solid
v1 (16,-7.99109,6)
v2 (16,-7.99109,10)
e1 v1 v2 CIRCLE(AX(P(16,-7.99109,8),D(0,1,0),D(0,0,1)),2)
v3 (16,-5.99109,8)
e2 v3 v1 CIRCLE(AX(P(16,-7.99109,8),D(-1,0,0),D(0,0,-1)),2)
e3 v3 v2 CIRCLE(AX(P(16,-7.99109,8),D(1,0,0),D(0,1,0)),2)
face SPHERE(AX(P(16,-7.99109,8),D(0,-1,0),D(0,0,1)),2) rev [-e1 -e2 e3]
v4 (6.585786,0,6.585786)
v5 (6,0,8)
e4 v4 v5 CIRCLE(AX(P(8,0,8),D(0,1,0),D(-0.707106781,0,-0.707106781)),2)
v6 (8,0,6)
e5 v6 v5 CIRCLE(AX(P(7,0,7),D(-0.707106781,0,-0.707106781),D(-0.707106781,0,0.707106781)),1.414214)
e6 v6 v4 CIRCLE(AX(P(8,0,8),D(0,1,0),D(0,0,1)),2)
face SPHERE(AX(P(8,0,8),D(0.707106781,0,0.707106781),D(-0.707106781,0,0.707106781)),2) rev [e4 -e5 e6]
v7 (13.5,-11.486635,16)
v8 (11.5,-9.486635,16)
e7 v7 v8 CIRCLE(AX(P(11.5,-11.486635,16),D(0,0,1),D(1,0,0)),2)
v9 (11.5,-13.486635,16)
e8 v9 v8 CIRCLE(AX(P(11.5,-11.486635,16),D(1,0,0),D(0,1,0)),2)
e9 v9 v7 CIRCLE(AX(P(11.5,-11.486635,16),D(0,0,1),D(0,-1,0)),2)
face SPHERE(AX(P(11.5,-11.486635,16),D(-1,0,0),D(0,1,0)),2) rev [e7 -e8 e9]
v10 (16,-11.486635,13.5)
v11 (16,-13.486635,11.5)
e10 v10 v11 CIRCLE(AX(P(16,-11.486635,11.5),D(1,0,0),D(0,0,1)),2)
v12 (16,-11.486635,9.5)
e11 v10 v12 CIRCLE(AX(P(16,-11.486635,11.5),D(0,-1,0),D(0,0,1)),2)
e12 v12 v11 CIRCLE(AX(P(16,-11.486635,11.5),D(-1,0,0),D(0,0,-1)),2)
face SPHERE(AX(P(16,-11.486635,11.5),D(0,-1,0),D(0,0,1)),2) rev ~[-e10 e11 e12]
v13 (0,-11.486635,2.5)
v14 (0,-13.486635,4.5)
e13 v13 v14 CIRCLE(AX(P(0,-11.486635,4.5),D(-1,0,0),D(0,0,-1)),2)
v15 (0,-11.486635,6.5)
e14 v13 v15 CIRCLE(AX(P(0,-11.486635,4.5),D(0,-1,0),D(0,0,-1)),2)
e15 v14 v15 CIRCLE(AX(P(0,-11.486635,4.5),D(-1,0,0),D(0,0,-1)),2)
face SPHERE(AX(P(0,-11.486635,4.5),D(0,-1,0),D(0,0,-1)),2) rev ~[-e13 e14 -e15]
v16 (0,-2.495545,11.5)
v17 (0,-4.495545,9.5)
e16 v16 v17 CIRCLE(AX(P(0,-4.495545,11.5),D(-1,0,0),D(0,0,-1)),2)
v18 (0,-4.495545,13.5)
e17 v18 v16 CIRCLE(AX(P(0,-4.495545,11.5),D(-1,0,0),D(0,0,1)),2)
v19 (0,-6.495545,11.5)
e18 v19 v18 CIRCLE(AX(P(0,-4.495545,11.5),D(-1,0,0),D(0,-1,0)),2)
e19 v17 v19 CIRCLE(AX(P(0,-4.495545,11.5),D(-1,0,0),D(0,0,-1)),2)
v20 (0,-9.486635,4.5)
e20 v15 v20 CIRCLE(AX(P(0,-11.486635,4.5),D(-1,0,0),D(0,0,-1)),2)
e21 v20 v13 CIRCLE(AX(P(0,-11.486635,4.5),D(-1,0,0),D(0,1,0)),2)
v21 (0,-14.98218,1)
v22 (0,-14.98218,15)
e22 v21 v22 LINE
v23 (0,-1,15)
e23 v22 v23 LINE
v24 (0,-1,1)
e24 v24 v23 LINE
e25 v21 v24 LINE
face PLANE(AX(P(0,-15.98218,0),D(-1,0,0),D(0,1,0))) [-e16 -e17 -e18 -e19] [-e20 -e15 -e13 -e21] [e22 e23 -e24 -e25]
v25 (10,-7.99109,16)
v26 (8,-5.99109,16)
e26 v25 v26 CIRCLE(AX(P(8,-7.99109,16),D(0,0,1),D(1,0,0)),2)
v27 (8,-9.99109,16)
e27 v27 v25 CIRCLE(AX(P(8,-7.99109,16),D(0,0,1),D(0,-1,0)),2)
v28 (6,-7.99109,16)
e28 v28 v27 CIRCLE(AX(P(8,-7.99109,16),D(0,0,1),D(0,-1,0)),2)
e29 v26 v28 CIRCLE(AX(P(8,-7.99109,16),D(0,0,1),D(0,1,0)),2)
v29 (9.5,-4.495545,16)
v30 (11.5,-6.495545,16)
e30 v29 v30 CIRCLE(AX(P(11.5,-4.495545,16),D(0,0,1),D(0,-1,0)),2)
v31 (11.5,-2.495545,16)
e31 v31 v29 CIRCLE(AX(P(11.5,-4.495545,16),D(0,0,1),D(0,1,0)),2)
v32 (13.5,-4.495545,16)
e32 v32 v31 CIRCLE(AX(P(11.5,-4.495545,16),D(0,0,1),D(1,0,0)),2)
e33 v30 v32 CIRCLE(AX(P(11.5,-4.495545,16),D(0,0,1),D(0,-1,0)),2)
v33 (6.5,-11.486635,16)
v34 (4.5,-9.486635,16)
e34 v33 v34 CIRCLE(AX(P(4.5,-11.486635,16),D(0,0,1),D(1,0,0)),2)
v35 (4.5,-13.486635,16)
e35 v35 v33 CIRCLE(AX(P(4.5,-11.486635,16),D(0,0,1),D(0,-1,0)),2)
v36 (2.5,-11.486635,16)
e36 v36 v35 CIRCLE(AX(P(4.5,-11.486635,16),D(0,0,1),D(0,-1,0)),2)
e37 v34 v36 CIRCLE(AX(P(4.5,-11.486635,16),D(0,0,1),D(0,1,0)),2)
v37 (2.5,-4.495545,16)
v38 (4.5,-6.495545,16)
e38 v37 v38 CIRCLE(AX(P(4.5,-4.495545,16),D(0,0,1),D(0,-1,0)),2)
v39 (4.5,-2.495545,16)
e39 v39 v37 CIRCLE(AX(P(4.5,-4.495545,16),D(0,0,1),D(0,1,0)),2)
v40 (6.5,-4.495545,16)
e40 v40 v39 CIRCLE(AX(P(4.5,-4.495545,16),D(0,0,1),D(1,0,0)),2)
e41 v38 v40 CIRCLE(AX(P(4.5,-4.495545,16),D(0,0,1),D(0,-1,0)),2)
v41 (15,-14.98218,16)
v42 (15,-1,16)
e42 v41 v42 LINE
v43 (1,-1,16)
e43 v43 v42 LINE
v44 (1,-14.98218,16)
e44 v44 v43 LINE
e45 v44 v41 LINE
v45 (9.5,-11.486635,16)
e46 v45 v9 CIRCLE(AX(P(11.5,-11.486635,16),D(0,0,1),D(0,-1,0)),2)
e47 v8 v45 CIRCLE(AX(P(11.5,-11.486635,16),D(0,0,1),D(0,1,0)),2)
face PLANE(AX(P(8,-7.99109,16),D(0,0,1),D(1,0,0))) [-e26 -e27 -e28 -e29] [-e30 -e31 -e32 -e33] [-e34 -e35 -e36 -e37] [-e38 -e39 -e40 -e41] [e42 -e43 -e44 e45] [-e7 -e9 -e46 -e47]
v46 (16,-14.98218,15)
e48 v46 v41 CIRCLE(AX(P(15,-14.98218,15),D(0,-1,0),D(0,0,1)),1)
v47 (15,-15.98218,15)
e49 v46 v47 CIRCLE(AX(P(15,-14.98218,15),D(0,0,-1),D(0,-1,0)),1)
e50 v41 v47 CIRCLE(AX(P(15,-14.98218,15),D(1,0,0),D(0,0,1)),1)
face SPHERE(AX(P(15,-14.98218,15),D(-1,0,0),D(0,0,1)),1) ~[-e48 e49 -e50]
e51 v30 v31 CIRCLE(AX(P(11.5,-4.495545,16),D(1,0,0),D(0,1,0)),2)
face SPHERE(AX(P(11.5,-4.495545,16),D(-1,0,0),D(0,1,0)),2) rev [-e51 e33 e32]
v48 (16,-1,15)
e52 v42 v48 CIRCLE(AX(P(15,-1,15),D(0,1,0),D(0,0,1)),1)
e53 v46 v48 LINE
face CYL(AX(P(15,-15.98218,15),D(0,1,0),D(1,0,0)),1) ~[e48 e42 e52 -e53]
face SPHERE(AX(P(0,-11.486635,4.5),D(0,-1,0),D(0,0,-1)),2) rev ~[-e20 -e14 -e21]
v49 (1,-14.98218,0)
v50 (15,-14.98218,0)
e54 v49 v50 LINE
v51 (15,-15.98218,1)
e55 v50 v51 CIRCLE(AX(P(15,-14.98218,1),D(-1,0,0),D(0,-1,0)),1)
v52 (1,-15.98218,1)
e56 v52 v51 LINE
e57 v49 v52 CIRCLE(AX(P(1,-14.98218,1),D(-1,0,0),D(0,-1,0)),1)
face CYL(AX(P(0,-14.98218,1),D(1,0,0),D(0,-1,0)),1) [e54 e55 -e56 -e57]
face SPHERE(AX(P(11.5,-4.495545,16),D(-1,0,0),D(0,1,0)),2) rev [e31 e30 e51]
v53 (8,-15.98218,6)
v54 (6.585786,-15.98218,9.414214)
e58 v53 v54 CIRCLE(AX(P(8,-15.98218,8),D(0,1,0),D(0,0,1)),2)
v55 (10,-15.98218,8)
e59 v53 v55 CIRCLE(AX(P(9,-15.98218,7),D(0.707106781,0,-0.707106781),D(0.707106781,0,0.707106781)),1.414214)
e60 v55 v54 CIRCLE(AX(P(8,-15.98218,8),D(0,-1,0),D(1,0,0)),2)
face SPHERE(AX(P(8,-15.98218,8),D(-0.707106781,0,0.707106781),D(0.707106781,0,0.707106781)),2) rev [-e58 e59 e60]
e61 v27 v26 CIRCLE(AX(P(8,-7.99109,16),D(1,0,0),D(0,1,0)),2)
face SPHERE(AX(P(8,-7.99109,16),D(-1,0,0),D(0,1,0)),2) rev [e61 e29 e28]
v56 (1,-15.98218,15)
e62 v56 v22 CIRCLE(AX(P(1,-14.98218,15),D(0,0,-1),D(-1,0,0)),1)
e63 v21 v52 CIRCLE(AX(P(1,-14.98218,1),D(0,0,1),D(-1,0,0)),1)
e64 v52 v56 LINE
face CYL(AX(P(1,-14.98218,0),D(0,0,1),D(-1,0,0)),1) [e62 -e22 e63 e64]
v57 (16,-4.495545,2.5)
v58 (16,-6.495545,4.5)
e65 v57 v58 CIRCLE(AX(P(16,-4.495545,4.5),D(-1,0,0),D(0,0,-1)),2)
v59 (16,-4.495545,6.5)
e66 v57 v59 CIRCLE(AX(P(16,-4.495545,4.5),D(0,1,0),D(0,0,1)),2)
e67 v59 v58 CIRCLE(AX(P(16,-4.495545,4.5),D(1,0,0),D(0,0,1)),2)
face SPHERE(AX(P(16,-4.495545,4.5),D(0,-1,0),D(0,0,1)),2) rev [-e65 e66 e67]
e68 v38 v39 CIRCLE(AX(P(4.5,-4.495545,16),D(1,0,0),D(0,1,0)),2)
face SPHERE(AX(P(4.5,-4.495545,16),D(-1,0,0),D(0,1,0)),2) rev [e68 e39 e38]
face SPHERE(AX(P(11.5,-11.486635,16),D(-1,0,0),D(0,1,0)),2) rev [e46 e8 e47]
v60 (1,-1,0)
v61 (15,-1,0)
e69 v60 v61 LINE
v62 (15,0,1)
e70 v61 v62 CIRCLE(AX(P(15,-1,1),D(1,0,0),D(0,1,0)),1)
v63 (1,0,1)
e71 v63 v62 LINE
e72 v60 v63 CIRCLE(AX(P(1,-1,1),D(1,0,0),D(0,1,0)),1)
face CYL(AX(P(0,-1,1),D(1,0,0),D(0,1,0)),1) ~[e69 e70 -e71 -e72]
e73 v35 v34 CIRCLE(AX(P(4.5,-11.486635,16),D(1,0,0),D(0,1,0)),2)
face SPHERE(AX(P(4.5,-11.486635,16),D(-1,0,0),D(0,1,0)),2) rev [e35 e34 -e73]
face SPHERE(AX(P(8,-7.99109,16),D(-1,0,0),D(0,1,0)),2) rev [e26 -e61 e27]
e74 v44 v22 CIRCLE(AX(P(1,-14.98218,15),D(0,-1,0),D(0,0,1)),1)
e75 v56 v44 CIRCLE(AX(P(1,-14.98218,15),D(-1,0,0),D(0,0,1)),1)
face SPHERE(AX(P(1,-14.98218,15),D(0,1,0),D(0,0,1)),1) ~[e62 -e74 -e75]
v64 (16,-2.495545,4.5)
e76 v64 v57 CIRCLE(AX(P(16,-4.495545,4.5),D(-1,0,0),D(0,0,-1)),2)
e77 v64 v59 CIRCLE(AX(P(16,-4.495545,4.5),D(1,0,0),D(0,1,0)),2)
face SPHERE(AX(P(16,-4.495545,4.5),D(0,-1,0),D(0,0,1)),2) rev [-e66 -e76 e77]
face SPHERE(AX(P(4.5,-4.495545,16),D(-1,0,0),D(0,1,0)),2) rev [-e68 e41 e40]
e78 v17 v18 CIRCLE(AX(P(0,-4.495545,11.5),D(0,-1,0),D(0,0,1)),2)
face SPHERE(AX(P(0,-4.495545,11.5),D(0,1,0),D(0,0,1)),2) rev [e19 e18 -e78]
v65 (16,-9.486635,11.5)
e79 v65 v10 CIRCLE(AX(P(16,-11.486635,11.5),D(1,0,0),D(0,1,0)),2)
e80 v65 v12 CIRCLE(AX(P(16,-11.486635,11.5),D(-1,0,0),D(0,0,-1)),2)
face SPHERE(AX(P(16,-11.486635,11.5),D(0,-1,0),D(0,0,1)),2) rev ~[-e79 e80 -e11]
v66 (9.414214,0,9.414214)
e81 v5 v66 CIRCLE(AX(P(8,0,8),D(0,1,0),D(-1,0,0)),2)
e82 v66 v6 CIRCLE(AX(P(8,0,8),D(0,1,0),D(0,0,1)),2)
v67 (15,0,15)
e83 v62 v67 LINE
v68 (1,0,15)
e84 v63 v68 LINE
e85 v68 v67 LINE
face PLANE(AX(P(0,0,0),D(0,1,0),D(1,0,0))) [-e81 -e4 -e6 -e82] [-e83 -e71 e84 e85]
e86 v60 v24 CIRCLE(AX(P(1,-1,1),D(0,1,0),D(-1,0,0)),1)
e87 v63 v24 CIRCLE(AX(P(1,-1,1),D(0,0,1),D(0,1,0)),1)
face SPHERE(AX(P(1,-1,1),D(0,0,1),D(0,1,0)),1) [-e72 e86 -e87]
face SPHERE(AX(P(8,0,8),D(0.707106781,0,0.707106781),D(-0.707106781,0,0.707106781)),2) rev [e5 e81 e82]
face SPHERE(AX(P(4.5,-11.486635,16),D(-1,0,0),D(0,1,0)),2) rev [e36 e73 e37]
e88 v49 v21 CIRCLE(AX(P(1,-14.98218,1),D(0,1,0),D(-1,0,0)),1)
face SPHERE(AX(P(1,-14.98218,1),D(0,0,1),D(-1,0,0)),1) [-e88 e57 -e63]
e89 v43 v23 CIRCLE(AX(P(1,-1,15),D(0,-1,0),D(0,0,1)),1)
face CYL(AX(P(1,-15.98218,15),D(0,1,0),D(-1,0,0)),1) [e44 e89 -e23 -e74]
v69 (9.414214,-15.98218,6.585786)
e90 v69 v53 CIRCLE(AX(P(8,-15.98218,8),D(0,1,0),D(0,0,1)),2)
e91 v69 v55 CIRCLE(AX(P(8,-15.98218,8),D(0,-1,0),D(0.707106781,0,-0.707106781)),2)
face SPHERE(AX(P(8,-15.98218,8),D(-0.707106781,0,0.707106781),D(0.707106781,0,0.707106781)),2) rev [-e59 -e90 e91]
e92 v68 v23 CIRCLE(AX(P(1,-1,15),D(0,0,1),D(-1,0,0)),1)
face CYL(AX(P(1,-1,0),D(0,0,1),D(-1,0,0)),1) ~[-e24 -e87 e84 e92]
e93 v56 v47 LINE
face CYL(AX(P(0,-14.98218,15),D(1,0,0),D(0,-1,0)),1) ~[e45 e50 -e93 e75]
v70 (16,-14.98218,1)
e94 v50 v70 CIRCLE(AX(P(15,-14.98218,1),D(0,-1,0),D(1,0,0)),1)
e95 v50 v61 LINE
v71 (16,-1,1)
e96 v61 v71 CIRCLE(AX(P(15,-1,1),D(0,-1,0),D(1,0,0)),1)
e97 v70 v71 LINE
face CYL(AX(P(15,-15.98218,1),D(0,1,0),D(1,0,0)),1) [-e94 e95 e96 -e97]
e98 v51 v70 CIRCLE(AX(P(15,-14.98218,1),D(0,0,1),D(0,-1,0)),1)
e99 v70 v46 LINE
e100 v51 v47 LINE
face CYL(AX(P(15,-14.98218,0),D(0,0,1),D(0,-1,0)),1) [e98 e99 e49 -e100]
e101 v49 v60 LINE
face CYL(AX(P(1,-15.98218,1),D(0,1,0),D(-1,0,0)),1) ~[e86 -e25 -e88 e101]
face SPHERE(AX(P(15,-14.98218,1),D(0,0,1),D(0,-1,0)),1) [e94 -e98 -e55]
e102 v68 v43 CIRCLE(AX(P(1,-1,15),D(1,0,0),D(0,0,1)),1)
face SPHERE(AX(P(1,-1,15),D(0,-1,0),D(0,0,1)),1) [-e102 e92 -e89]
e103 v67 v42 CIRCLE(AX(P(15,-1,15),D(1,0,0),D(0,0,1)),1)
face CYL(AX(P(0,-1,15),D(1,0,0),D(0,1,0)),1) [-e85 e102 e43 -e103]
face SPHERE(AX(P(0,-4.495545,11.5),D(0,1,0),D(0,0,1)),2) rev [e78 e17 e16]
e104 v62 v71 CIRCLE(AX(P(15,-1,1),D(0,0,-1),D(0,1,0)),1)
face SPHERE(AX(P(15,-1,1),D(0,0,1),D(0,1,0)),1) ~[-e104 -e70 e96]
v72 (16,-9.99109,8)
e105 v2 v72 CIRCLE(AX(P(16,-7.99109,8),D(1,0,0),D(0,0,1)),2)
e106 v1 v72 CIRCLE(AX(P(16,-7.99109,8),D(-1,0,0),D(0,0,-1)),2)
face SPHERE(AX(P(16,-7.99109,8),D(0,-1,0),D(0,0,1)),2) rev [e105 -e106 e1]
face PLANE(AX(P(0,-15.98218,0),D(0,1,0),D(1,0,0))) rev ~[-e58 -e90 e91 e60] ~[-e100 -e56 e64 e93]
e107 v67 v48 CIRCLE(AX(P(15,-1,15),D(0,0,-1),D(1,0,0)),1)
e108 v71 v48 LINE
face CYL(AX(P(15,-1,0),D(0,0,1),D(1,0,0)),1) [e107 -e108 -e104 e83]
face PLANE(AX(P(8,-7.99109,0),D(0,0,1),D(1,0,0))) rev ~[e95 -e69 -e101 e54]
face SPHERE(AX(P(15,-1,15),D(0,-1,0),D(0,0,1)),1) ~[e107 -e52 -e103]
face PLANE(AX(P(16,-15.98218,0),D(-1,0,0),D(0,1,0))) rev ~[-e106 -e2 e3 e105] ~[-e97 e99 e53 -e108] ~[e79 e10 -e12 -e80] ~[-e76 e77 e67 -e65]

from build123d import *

# Parameters (mm, degrees)
F1_W     = 16
F1_H     = 15.9821804036
F2_DEPTH = 16
F3_R     = 1


# Not quite as in the source:
# - a feature of the source that left no trace in its solid (it failed there, or was rolled back) is left out


with BuildPart() as f2:
    # F1 (on Top) → F2 (new body)
    with BuildSketch(Plane.XY):
        with Locations((8, -7.9910902018)):
            Rectangle(F1_W, F1_H)
    extrude(amount=F2_DEPTH)

    # F3
    f3_edges = [f2.edges().sort_by_distance(p)[0] for p in [
        (0, -7.99109, 16),
        (8, -15.98218, 16),
        (16, -7.99109, 16),
        (8, 0, 16),
        (0, -15.98218, 8),
        (0, 0, 8),
        (16, -15.98218, 8),
        (16, 0, 8),
        (8, 0, 0),
        (0, -7.99109, 0),
        (8, -15.98218, 0),
        (16, -7.99109, 0),
    ]]
    fillet(f3_edges, radius=F3_R)

    # F4 (on face) → F5 (revolve, cut)
    with BuildSketch(Plane.XZ.offset(15.9821804036)):
        with BuildLine():
            ThreePointArc((9.4142135624, 6.5857864376), (9.847759065, 7.2346331353), (10, 8))
            ThreePointArc((10, 8), (8.7653668647, 9.847759065), (6.5857864376, 9.4142135624))
            Line((6.5857864376, 9.4142135624), (9.4142135624, 6.5857864376))
        make_face()
    revolve(axis=Axis((8, -15.9821804036, 8), (0.7071067812, 0, -0.7071067812)), mode=Mode.SUBTRACT)

    # F6 (on face) → F7 (revolve, cut)
    with BuildSketch(Plane(origin=(0, 0, 0), x_dir=(-1, 0, 0), z_dir=(0, 1, 0))):
        with BuildLine():
            ThreePointArc((-6, 8), (-7.2346331353, 9.847759065), (-9.4142135624, 9.4142135624))
            Line((-9.4142135624, 9.4142135624), (-6.5857864376, 6.5857864376))
            ThreePointArc((-6.5857864376, 6.5857864376), (-6.152240935, 7.2346331353), (-6, 8))
        make_face()
    revolve(axis=Axis((8, 0, 8), (-0.7071067812, 0, -0.7071067812)), mode=Mode.SUBTRACT)

    # F8 (on face) → F9 (revolve, cut)
    with BuildSketch(Plane(origin=(0, 0, 0), x_dir=(0, -1, 0), z_dir=(-1, 0, 0))):
        with BuildLine():
            Line((4.4955451009, 11.5), (4.4955451009, 13.5))
            ThreePointArc((4.4955451009, 13.5), (3.0813315385, 12.9142135624), (2.4955451009, 11.5))
            Line((2.4955451009, 11.5), (4.4955451009, 11.5))
        make_face()
        with BuildLine():
            Line((4.4955451009, 11.5), (6.4955451009, 11.5))
            ThreePointArc((6.4955451009, 11.5), (5.9097586633, 12.9142135624), (4.4955451009, 13.5))
            Line((4.4955451009, 13.5), (4.4955451009, 11.5))
        make_face()
    revolve(axis=Axis((0, -7.9910902018, 11.5), (0, -1, 0)), mode=Mode.SUBTRACT)

    # F8 (on face) → F10 (revolve, cut)
    with BuildSketch(Plane(origin=(0, 0, 0), x_dir=(0, -1, 0), z_dir=(-1, 0, 0))):
        with BuildLine():
            Line((11.4866353027, 4.5), (9.4866353027, 4.5))
            ThreePointArc((9.4866353027, 4.5), (10.0724217403, 3.0857864376), (11.4866353027, 2.5))
            Line((11.4866353027, 2.5), (11.4866353027, 4.5))
        make_face()
        with BuildLine():
            Line((11.4866353027, 4.5), (11.4866353027, 2.5))
            ThreePointArc((11.4866353027, 2.5), (12.9008488651, 3.0857864376), (13.4866353027, 4.5))
            Line((13.4866353027, 4.5), (11.4866353027, 4.5))
        make_face()
    revolve(axis=Axis((0, -7.9910902018, 4.5), (0, -1, 0)), mode=Mode.SUBTRACT)

    # F11 (on face) → F12 (revolve, cut)
    with BuildSketch(Plane.YZ.offset(16)):
        with BuildLine():
            Line((-11.4866353027, 11.5), (-11.4866353027, 13.5))
            ThreePointArc((-11.4866353027, 13.5), (-12.9008488651, 12.9142135624), (-13.4866353027, 11.5))
            Line((-13.4866353027, 11.5), (-11.4866353027, 11.5))
        make_face()
        with BuildLine():
            Line((-11.4866353027, 11.5), (-9.4866353027, 11.5))
            ThreePointArc((-9.4866353027, 11.5), (-10.0724217403, 12.9142135624), (-11.4866353027, 13.5))
            Line((-11.4866353027, 13.5), (-11.4866353027, 11.5))
        make_face()
    revolve(axis=Axis((16, -7.9910902018, 11.5), (0, -1, 0)), mode=Mode.SUBTRACT)

    # F11 (on face) → F13 (revolve, cut)
    with BuildSketch(Plane.YZ.offset(16)):
        with BuildLine():
            Line((-7.9910902018, 8), (-7.9910902018, 10))
            ThreePointArc((-7.9910902018, 10), (-9.4053037642, 9.4142135624), (-9.9910902018, 8))
            Line((-9.9910902018, 8), (-7.9910902018, 8))
        make_face()
        with BuildLine():
            ThreePointArc((-5.9910902018, 8), (-6.5768766394, 9.4142135624), (-7.9910902018, 10))
            Line((-7.9910902018, 10), (-7.9910902018, 8))
            Line((-7.9910902018, 8), (-5.9910902018, 8))
        make_face()
    revolve(axis=Axis((16, -4.4955451009, 8), (0, 1, 0)), mode=Mode.SUBTRACT)

    # F11 (on face) → F14 (revolve, cut)
    with BuildSketch(Plane.YZ.offset(16)):
        with BuildLine():
            Line((-4.4955451009, 4.5), (-4.4955451009, 6.5))
            ThreePointArc((-4.4955451009, 6.5), (-5.9097586633, 5.9142135624), (-6.4955451009, 4.5))
            Line((-6.4955451009, 4.5), (-4.4955451009, 4.5))
        make_face()
        with BuildLine():
            ThreePointArc((-2.4955451009, 4.5), (-3.0813315385, 5.9142135624), (-4.4955451009, 6.5))
            Line((-4.4955451009, 6.5), (-4.4955451009, 4.5))
            Line((-4.4955451009, 4.5), (-2.4955451009, 4.5))
        make_face()
    revolve(axis=Axis((16, -7.9910902018, 4.5), (0, 1, 0)), mode=Mode.SUBTRACT)

    # F15 (on face) → F16 (revolve, cut)
    with BuildSketch(Plane.XY.offset(16)):
        with BuildLine():
            ThreePointArc((4.5, -2.4955451009), (3.0857864376, -3.0813315385), (2.5, -4.4955451009))
            Line((2.5, -4.4955451009), (4.5, -4.4955451009))
            Line((4.5, -4.4955451009), (4.5, -2.4955451009))
        make_face()
        with BuildLine():
            Line((4.5, -2.4955451009), (4.5, -4.4955451009))
            Line((4.5, -4.4955451009), (6.5, -4.4955451009))
            ThreePointArc((6.5, -4.4955451009), (5.9142135624, -3.0813315385), (4.5, -2.4955451009))
        make_face()
        with BuildLine():
            ThreePointArc((11.5, -2.4955451009), (10.0857864376, -3.0813315385), (9.5, -4.4955451009))
            Line((9.5, -4.4955451009), (11.5, -4.4955451009))
            Line((11.5, -4.4955451009), (11.5, -2.4955451009))
        make_face()
        with BuildLine():
            ThreePointArc((13.5, -4.4955451009), (12.9142135624, -3.0813315385), (11.5, -2.4955451009))
            Line((11.5, -2.4955451009), (11.5, -4.4955451009))
            Line((11.5, -4.4955451009), (13.5, -4.4955451009))
        make_face()
    revolve(axis=Axis((8, -4.4955451009, 16), (1, 0, 0)), mode=Mode.SUBTRACT)

    # F15 (on face) → F17 (revolve, cut)
    with BuildSketch(Plane.XY.offset(16)):
        with BuildLine():
            ThreePointArc((4.5, -9.4866353027), (3.0857864376, -10.0724217403), (2.5, -11.4866353027))
            Line((2.5, -11.4866353027), (4.5, -11.4866353027))
            Line((4.5, -11.4866353027), (4.5, -9.4866353027))
        make_face()
        with BuildLine():
            Line((4.5, -9.4866353027), (4.5, -11.4866353027))
            Line((4.5, -11.4866353027), (6.5, -11.4866353027))
            ThreePointArc((6.5, -11.4866353027), (5.9142135624, -10.0724217403), (4.5, -9.4866353027))
        make_face()
        with BuildLine():
            ThreePointArc((11.5, -9.4866353027), (10.0857864376, -10.0724217403), (9.5, -11.4866353027))
            Line((9.5, -11.4866353027), (11.5, -11.4866353027))
            Line((11.5, -11.4866353027), (11.5, -9.4866353027))
        make_face()
        with BuildLine():
            Line((11.5, -9.4866353027), (11.5, -11.4866353027))
            Line((11.5, -11.4866353027), (13.5, -11.4866353027))
            ThreePointArc((13.5, -11.4866353027), (12.9142135624, -10.0724217403), (11.5, -9.4866353027))
        make_face()
    revolve(axis=Axis((8, -11.4866353027, 16), (1, 0, 0)), mode=Mode.SUBTRACT)

    # F15 (on face) → F18 (revolve, cut)
    with BuildSketch(Plane.XY.offset(16)):
        with BuildLine():
            ThreePointArc((8, -5.9910902018), (6.5857864376, -6.5768766394), (6, -7.9910902018))
            Line((6, -7.9910902018), (8, -7.9910902018))
            Line((8, -7.9910902018), (8, -5.9910902018))
        make_face()
        with BuildLine():
            Line((8, -5.9910902018), (8, -7.9910902018))
            Line((8, -7.9910902018), (10, -7.9910902018))
            ThreePointArc((10, -7.9910902018), (9.4142135624, -6.5768766394), (8, -5.9910902018))
        make_face()
    revolve(axis=Axis((8, -7.9910902018, 16), (1, 0, 0)), mode=Mode.SUBTRACT)


solid = f2.part
